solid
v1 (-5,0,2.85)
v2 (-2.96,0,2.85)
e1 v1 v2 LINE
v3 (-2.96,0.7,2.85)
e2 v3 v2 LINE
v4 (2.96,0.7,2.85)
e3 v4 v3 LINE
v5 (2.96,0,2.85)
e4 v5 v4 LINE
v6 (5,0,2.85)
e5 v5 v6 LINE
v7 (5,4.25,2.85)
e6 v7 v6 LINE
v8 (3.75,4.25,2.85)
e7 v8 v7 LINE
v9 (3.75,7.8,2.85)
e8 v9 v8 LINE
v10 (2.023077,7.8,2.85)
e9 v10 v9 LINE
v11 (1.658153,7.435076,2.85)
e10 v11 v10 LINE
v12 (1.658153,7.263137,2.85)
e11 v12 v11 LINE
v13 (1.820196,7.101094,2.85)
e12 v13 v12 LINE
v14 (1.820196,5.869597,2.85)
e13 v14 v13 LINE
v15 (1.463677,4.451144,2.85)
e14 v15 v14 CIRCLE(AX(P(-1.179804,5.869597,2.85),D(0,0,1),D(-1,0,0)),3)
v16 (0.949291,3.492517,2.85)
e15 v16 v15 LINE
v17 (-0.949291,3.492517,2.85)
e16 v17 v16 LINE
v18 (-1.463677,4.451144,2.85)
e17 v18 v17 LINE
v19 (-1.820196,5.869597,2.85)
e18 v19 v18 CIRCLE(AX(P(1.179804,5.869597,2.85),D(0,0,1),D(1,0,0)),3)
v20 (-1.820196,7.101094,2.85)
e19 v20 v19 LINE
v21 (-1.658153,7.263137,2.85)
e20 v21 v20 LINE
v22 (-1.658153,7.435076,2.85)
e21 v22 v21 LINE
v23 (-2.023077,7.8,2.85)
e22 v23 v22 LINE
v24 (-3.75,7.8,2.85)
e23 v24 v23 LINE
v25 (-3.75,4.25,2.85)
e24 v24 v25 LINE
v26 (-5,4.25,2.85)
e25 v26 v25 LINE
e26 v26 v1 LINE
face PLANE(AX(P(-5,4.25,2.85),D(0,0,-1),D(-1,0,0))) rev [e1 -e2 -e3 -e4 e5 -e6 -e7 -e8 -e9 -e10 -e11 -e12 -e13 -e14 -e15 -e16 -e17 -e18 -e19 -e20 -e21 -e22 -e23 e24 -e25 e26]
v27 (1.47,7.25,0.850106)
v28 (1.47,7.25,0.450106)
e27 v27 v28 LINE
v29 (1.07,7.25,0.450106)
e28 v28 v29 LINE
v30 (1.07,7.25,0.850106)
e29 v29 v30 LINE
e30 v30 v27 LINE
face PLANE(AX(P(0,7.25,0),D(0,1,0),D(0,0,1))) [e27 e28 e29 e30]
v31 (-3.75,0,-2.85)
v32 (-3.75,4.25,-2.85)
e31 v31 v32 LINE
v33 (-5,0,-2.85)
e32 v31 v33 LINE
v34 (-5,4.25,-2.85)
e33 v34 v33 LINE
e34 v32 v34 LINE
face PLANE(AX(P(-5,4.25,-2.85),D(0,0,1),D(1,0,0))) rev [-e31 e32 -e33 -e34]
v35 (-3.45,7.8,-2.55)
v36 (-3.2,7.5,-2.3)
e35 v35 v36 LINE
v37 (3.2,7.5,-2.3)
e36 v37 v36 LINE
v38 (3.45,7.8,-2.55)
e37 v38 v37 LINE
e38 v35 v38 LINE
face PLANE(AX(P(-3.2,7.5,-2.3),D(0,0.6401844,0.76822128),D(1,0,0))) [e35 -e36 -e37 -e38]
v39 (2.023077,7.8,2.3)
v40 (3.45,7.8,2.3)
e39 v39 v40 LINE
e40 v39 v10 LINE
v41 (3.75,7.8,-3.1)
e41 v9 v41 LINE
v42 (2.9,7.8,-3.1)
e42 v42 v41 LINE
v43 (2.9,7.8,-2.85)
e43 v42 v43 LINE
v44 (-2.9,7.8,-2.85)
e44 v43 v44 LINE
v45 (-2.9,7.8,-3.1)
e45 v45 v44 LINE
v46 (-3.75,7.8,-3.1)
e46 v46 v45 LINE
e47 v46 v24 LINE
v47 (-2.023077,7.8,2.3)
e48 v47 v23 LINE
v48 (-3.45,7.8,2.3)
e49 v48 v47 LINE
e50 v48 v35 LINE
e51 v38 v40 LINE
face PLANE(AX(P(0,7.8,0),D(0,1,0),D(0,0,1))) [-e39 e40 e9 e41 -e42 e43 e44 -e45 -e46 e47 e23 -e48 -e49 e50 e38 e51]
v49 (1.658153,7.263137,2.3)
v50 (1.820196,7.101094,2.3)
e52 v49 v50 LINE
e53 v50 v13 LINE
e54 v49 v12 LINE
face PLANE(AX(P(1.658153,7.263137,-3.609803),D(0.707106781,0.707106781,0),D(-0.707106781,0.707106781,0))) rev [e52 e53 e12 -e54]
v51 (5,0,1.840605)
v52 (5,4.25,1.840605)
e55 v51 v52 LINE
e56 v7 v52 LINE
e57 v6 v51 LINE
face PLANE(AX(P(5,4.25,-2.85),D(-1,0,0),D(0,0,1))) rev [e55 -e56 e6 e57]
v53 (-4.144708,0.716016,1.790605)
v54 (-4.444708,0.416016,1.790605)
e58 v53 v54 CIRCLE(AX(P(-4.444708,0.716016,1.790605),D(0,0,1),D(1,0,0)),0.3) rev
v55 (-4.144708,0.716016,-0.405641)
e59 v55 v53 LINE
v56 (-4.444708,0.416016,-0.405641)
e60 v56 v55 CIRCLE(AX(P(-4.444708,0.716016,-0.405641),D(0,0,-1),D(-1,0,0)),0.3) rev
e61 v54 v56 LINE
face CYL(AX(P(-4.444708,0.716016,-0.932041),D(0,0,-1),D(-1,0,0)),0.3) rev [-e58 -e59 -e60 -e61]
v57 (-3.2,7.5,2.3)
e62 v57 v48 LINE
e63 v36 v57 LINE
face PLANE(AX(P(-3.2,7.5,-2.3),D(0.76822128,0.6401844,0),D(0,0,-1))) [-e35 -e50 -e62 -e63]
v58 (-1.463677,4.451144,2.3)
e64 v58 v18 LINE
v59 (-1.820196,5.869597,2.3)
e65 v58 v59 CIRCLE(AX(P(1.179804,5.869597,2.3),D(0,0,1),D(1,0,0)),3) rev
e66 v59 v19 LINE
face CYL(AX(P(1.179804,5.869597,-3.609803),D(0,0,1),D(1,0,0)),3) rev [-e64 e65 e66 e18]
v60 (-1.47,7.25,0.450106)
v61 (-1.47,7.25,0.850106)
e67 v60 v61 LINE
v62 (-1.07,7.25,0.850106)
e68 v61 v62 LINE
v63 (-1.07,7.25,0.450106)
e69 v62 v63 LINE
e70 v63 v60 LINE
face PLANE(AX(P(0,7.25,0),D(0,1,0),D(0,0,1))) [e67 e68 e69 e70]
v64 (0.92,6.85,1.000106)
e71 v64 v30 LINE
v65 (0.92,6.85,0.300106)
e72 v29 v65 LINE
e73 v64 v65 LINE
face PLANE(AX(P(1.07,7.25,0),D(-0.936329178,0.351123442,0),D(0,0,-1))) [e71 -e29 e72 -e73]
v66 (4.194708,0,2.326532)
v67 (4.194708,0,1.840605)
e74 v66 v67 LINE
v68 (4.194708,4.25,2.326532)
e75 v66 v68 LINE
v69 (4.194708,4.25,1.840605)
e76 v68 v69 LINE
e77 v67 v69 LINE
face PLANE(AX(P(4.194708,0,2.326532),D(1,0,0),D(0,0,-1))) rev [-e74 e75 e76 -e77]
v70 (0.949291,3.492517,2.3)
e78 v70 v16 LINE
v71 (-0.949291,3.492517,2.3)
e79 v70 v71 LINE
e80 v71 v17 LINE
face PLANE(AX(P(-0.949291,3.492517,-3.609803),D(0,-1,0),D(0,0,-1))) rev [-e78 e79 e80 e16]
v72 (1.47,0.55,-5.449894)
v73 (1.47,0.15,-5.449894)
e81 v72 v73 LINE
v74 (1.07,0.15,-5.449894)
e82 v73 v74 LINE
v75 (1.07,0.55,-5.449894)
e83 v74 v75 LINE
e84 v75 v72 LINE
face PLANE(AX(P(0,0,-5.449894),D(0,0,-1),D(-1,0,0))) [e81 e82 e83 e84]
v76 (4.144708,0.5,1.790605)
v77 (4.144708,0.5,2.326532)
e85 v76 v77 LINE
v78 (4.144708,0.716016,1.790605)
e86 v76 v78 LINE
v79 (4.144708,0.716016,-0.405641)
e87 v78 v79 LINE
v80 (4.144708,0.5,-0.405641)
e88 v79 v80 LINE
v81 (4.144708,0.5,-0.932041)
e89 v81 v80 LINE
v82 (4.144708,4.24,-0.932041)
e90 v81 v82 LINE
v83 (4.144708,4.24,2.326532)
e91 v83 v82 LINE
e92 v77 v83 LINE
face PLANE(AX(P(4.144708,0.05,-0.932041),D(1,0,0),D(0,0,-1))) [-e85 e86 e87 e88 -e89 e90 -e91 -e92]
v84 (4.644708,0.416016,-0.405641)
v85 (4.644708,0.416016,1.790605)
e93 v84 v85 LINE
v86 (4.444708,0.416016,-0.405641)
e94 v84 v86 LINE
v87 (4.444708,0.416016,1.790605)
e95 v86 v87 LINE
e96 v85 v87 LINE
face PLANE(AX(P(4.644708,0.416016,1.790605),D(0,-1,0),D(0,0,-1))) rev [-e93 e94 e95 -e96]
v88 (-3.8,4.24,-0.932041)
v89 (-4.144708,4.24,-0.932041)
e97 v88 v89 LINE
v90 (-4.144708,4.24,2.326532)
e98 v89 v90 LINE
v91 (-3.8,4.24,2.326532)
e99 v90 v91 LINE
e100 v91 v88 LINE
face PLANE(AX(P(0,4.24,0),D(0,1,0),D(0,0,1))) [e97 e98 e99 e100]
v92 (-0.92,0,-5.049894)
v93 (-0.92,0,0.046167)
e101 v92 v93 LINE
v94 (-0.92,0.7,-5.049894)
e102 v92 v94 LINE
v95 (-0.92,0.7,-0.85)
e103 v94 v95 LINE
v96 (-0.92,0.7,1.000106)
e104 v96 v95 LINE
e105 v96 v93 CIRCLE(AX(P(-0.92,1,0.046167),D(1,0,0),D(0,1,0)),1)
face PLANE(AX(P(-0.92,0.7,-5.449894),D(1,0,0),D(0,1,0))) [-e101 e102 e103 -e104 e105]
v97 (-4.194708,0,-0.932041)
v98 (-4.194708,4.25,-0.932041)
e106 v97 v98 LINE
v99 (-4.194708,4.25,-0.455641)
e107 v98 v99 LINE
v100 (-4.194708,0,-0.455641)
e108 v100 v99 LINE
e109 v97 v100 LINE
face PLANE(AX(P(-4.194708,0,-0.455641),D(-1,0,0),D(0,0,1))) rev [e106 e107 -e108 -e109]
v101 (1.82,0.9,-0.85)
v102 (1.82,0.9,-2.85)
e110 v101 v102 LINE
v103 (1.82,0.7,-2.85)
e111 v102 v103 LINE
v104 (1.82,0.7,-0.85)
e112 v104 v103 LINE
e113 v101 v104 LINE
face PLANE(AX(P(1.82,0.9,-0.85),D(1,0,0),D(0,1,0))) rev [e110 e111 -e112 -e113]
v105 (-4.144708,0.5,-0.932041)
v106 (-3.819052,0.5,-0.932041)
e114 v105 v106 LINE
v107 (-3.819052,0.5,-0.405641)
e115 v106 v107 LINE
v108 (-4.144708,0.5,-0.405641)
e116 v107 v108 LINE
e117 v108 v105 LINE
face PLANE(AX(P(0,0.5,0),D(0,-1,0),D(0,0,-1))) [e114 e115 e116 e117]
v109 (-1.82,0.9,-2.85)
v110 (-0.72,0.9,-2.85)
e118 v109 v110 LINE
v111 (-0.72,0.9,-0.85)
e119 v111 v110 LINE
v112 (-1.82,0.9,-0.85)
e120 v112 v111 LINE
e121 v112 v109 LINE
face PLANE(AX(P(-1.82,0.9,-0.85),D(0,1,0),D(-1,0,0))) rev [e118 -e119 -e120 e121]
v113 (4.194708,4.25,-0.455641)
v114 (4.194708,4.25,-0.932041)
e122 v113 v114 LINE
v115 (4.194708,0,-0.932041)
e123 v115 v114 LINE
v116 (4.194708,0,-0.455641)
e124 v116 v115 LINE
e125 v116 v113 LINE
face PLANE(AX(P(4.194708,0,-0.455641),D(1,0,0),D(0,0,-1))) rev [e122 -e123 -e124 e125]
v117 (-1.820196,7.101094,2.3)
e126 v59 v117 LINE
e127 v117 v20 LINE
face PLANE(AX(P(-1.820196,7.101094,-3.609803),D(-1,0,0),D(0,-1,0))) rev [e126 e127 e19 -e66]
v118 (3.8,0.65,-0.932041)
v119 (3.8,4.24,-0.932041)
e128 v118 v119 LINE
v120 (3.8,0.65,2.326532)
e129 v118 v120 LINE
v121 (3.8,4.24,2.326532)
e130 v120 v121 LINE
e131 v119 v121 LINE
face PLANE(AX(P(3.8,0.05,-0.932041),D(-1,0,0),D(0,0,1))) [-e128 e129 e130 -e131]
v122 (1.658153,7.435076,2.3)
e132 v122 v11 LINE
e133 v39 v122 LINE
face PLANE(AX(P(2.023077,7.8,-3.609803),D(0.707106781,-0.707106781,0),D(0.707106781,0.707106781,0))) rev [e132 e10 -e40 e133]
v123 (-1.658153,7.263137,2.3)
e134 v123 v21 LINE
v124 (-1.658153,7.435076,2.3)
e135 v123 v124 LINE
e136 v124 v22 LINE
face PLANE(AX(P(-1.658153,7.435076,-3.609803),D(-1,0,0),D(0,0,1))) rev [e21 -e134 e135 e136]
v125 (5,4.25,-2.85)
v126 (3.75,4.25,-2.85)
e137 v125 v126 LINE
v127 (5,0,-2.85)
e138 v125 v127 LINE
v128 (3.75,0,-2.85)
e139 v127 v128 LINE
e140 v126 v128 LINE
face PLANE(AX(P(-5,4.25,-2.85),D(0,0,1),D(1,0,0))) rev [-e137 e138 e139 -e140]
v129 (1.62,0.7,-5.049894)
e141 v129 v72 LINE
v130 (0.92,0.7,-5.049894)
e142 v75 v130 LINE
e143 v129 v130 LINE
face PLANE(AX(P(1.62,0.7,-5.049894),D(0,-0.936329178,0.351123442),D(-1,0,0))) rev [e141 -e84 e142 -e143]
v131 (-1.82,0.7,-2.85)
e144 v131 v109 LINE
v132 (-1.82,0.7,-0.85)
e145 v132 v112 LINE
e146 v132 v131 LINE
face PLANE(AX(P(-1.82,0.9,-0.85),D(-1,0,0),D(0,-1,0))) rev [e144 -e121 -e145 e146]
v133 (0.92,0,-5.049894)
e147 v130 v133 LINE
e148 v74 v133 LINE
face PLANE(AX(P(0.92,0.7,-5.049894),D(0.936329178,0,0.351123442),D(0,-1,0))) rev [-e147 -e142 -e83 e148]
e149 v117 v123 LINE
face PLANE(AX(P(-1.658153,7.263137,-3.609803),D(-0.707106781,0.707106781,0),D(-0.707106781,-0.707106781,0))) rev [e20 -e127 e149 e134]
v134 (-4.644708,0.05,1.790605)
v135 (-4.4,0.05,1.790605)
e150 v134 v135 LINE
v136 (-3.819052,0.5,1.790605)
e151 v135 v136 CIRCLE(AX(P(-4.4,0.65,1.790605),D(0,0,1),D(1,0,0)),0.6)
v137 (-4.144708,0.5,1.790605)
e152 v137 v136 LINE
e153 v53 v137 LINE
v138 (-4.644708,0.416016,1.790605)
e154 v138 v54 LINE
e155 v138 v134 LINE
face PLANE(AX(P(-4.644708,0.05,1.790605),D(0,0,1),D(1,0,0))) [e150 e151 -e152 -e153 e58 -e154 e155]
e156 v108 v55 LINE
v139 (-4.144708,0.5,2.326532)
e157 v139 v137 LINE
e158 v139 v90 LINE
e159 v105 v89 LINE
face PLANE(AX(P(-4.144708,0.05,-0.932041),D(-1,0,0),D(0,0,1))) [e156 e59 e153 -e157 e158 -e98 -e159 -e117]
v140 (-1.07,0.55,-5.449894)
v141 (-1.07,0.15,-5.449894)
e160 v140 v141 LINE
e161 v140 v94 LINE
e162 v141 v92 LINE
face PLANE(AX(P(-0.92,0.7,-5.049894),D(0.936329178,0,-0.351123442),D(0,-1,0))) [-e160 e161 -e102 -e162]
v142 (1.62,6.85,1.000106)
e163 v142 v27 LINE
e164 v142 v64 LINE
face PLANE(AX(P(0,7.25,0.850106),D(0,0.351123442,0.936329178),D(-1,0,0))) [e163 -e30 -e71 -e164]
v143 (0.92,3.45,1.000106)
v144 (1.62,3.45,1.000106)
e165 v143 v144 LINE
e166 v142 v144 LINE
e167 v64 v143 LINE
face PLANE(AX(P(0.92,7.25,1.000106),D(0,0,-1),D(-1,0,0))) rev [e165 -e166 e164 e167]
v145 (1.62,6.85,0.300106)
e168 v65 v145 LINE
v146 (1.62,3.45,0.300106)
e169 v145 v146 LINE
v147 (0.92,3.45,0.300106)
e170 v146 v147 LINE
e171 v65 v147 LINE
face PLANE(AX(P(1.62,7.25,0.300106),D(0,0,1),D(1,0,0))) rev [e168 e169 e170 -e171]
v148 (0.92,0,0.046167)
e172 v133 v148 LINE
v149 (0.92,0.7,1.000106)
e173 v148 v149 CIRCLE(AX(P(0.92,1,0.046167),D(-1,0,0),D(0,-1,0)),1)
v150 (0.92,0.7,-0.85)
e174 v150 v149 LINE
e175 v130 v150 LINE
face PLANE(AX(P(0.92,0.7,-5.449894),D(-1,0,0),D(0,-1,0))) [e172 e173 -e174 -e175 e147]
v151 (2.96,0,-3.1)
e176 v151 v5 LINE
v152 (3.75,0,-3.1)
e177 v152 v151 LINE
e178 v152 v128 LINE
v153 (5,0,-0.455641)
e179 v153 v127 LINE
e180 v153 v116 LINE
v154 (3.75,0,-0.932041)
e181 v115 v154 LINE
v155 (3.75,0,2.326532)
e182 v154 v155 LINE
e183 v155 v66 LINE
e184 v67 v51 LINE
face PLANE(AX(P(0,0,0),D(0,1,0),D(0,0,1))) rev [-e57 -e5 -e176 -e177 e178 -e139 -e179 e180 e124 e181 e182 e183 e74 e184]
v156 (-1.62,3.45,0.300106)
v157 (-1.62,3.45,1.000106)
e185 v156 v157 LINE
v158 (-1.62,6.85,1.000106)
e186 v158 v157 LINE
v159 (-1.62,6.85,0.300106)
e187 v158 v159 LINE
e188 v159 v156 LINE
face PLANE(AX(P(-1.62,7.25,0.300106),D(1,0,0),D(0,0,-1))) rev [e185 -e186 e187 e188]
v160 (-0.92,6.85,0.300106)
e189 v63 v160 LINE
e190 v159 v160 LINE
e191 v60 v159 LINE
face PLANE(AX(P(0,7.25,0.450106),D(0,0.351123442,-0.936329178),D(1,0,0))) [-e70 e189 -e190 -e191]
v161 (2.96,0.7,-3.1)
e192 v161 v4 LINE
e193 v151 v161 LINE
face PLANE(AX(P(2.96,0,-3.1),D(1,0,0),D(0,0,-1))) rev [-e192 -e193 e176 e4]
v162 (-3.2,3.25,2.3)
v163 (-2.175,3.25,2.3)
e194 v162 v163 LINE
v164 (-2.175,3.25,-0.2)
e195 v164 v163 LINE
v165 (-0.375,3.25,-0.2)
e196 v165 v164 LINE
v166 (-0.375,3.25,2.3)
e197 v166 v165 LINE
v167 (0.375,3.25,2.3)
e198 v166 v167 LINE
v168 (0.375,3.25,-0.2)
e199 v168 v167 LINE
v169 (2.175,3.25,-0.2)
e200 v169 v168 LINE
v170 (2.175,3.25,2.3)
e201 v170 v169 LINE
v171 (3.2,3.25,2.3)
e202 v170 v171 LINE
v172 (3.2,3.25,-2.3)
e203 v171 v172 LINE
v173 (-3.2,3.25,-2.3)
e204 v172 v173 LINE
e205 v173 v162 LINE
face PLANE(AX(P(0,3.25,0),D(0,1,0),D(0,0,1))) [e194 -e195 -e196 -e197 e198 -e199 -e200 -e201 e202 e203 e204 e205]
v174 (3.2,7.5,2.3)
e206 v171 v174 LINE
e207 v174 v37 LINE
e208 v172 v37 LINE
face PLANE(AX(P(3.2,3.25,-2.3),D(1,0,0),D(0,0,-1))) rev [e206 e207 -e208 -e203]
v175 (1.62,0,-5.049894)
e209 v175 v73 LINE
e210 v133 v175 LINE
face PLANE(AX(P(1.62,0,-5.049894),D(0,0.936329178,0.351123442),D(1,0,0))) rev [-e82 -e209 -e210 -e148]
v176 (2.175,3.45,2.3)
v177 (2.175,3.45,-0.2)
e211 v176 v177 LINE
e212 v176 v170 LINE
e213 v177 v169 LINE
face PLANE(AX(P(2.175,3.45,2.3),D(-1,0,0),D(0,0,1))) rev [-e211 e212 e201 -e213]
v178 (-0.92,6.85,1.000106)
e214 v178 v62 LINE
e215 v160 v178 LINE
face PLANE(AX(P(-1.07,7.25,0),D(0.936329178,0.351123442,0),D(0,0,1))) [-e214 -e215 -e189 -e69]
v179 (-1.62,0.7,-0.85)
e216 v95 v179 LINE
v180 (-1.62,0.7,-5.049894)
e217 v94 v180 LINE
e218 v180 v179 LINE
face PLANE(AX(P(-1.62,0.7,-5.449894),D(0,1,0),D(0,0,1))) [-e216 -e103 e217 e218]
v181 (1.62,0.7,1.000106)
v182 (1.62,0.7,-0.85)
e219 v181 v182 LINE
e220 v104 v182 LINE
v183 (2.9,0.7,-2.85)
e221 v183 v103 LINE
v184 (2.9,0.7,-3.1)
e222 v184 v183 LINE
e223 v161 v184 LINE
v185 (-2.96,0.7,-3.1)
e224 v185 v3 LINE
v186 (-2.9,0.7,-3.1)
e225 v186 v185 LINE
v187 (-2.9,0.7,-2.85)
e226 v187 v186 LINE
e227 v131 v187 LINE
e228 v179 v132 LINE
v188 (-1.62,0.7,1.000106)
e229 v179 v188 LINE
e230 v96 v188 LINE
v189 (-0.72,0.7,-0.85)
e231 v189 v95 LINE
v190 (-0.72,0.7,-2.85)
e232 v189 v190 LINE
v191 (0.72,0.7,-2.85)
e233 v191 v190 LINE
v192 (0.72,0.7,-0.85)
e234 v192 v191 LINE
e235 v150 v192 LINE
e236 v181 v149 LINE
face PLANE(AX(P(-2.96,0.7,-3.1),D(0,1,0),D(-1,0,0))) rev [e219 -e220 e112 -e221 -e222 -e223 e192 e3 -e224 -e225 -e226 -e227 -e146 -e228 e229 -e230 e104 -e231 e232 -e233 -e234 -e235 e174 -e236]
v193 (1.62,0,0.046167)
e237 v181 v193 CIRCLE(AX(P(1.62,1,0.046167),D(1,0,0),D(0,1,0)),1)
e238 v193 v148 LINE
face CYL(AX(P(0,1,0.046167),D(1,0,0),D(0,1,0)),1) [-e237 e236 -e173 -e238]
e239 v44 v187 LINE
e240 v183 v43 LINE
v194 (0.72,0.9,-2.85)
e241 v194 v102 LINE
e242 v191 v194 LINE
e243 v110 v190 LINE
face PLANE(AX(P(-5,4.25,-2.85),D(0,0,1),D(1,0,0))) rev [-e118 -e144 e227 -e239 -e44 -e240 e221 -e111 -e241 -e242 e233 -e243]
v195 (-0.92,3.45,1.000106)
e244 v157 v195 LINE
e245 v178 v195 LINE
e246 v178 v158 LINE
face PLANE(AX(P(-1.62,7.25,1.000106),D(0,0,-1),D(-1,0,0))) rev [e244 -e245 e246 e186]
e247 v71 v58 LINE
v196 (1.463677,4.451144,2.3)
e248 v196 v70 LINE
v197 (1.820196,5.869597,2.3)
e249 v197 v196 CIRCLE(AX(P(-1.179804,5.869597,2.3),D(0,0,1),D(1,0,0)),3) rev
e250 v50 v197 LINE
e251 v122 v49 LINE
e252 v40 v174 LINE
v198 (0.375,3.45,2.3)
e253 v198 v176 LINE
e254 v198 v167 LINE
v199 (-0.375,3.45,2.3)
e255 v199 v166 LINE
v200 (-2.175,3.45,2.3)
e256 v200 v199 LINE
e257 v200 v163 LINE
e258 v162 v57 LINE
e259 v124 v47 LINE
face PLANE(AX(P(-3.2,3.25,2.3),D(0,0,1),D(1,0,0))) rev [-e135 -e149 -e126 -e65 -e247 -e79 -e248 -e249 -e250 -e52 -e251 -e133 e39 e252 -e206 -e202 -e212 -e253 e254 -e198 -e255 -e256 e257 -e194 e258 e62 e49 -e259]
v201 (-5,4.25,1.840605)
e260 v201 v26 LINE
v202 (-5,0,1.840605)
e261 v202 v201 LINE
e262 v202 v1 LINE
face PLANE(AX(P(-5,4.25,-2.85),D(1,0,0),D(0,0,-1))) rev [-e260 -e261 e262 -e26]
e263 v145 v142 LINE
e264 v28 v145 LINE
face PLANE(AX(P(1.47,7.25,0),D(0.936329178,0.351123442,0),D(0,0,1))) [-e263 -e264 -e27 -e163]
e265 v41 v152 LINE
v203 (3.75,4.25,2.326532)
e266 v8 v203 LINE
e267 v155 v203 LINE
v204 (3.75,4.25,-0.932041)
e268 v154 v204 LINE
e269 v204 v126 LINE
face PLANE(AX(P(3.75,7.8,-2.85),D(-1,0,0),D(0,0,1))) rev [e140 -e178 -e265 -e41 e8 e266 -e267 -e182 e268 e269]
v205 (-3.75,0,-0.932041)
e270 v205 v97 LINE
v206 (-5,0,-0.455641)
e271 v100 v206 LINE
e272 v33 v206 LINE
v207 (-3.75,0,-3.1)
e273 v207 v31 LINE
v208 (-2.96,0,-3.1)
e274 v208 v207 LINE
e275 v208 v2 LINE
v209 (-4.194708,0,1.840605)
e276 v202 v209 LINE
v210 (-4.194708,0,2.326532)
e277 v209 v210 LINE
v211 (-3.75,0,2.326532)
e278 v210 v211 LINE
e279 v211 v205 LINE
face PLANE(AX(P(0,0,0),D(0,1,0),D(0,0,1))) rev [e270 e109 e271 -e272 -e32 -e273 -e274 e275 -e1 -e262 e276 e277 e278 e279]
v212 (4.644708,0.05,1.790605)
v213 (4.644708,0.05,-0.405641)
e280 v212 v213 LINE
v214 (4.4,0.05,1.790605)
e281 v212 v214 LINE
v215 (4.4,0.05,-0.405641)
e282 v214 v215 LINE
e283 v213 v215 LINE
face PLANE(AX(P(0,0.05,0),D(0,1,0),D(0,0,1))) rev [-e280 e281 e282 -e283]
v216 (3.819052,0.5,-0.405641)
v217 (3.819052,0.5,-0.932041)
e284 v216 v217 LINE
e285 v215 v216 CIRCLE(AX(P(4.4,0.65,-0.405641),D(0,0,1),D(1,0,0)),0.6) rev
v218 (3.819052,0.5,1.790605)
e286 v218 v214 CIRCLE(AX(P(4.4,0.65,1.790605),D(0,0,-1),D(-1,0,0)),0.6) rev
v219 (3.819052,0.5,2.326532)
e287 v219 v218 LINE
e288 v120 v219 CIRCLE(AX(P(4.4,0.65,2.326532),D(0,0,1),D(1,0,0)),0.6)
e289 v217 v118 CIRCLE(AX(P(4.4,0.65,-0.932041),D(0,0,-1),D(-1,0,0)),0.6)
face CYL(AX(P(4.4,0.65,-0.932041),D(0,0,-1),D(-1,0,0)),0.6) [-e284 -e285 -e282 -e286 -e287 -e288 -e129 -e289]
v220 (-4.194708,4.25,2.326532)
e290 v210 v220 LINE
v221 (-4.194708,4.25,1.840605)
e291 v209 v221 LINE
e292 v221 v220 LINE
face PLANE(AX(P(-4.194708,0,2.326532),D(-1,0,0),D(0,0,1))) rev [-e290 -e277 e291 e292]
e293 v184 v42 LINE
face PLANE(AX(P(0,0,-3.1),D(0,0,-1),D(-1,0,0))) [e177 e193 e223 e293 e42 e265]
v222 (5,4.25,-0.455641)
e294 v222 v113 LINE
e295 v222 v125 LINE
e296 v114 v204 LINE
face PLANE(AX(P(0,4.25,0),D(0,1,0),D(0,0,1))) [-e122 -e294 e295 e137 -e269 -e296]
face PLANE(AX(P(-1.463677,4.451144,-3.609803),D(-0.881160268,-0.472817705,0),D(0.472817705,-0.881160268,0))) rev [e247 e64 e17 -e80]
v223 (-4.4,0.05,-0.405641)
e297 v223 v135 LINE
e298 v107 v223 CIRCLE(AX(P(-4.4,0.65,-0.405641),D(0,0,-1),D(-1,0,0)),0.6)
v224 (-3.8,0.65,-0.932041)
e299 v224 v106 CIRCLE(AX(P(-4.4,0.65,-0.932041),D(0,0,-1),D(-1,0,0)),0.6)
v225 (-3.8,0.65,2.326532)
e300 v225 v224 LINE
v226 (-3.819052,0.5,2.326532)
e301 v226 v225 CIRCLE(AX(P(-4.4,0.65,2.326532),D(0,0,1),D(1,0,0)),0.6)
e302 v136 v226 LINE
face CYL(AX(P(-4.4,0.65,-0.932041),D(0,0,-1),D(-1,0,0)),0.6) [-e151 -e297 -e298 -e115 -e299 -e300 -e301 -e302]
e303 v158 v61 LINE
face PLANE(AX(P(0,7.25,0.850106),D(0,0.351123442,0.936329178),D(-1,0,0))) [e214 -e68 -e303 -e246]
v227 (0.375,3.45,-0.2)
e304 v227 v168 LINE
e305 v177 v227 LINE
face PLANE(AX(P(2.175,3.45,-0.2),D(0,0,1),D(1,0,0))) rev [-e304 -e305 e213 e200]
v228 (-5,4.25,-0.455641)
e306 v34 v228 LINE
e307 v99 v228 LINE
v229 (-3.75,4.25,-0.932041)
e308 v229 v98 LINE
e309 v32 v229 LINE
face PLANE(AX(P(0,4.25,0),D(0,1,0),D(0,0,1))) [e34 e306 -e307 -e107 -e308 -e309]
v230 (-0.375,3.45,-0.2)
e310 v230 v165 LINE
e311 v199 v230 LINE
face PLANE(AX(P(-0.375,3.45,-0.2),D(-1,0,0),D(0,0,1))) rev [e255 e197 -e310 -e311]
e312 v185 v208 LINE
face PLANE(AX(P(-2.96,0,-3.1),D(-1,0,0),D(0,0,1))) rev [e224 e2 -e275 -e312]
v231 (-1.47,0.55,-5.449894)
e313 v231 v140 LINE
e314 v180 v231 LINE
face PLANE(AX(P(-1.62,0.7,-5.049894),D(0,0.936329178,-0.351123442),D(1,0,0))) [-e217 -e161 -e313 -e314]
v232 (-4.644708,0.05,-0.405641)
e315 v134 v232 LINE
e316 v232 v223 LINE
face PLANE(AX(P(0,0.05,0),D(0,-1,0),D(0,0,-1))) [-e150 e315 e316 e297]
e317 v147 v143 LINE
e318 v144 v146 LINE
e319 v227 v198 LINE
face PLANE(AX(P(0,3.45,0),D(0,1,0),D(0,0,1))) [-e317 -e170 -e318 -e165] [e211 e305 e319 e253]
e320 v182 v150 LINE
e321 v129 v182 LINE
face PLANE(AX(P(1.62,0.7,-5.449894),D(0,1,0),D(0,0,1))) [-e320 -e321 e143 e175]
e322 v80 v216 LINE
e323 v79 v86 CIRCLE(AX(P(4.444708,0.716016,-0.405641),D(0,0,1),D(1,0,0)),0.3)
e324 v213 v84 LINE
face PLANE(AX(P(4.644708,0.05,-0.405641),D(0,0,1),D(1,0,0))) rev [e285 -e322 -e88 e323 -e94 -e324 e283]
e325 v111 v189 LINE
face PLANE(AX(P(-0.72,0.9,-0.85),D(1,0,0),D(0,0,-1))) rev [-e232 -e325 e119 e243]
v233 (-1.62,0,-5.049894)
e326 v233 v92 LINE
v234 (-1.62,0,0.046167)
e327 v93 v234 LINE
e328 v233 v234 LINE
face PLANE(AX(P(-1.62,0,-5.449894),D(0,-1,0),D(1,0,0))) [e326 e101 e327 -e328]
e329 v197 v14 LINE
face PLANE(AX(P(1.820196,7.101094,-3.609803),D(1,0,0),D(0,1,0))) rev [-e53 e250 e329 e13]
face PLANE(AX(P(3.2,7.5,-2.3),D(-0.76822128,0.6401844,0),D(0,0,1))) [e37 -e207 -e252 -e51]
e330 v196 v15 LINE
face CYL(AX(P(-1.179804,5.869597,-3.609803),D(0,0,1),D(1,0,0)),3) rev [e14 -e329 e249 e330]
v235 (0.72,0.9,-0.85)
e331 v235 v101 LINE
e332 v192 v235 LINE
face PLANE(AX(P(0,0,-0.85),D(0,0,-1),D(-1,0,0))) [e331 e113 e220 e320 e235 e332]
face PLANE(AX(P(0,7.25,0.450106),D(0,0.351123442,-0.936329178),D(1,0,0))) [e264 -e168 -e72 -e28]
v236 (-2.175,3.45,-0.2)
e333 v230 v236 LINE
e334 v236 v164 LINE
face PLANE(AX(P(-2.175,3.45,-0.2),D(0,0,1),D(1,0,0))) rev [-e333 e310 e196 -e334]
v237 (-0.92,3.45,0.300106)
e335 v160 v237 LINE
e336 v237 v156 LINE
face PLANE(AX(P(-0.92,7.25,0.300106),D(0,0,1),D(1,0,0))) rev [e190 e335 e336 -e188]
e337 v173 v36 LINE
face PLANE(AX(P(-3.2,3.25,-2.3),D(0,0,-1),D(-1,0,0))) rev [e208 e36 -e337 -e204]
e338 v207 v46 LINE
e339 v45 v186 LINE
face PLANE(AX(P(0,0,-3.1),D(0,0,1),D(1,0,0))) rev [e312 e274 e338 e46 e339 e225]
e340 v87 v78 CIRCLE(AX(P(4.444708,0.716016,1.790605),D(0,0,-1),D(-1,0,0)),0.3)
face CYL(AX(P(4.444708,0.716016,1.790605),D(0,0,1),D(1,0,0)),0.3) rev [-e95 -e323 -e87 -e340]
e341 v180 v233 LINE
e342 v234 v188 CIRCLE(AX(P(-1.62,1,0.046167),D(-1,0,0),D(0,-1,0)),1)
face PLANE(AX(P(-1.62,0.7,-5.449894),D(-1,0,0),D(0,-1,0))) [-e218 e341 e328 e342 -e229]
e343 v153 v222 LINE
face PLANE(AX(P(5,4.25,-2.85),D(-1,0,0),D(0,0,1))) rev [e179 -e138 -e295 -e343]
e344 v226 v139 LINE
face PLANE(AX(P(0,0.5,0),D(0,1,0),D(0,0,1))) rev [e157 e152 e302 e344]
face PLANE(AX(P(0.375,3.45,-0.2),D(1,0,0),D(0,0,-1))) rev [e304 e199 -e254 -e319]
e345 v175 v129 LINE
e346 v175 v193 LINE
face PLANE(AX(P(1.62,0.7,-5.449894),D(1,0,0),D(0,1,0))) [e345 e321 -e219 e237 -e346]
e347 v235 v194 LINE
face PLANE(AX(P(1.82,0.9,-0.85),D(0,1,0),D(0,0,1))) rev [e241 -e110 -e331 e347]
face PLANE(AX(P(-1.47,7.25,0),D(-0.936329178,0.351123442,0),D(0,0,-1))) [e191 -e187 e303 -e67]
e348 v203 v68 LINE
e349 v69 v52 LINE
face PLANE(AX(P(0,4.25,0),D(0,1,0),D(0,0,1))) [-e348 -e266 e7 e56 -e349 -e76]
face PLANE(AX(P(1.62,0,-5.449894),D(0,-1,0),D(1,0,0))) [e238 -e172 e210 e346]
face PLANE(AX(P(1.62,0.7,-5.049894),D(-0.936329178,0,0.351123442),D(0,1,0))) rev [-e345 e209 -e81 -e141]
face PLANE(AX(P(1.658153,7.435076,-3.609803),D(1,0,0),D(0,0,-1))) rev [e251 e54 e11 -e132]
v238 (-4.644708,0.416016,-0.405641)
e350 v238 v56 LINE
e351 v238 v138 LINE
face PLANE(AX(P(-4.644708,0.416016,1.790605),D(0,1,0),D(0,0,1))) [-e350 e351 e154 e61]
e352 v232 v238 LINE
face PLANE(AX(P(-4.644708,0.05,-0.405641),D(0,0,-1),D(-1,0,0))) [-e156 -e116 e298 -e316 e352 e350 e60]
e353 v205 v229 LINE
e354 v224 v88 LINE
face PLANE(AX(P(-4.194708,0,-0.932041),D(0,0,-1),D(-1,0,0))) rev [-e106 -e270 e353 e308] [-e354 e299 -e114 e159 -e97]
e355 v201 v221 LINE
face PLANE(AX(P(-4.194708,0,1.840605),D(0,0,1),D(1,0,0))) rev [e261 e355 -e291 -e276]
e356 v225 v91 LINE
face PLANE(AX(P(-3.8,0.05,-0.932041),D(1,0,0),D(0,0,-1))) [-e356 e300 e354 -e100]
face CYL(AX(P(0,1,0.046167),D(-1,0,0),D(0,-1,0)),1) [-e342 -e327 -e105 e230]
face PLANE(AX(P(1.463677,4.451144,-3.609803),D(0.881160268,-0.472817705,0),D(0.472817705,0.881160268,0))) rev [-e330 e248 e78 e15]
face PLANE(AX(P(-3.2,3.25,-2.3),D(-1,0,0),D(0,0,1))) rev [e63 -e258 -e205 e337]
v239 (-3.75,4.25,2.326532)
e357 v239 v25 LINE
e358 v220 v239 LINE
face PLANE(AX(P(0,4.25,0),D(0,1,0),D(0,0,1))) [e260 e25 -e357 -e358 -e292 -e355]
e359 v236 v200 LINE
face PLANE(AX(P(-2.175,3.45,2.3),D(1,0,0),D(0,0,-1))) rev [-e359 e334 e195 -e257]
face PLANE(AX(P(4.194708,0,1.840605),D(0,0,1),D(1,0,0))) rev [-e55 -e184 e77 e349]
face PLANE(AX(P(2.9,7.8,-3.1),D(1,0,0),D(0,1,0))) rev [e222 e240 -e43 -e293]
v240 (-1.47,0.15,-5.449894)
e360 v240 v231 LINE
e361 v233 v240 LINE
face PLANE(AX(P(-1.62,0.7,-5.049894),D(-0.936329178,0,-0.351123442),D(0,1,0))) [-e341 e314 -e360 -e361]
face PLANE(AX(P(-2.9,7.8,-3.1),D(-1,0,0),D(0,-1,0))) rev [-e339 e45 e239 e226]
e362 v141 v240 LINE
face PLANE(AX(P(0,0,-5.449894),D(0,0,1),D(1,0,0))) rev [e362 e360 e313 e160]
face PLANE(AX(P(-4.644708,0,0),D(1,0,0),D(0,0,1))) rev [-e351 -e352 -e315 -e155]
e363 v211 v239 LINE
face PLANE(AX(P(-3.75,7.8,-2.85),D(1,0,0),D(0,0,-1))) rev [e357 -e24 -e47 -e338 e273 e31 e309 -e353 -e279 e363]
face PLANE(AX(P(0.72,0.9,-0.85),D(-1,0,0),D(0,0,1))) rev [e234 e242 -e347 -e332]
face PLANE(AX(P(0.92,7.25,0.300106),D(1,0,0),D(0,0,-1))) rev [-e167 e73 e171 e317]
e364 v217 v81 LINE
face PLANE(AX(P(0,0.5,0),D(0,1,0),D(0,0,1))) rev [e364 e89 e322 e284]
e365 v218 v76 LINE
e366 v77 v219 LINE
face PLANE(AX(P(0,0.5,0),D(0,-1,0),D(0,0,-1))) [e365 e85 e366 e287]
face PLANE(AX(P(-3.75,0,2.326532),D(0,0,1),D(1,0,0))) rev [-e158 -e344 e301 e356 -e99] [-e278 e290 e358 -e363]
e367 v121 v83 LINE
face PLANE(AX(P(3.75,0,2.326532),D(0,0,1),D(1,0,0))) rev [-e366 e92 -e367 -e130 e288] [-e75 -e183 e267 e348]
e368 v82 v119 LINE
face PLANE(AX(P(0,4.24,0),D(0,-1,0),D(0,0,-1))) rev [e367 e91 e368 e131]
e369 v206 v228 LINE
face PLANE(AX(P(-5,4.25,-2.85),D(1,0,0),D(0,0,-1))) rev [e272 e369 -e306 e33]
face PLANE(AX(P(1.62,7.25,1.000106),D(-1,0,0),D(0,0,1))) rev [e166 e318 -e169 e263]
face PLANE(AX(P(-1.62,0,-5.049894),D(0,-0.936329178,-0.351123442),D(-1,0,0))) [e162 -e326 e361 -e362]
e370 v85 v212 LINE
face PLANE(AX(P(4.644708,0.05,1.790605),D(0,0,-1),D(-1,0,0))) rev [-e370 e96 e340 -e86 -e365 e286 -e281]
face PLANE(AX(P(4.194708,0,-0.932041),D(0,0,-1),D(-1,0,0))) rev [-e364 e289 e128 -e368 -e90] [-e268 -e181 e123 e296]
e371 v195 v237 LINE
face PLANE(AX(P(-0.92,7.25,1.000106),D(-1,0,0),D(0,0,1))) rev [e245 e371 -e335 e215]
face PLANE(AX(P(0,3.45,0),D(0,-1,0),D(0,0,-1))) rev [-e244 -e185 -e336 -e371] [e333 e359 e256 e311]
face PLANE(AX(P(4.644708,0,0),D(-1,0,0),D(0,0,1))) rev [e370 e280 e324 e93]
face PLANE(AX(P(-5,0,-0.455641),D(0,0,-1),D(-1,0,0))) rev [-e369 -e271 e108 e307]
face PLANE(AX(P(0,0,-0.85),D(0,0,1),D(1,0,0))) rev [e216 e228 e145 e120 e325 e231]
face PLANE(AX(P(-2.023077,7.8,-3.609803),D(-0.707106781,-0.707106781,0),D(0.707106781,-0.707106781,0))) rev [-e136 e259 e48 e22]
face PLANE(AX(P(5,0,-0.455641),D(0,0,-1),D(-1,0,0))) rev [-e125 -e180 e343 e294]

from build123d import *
from OCP.BRepFilletAPI import BRepFilletAPI_MakeChamfer

# Parameters (mm, degrees)
SKETCH1_W           = 10
SKETCH1_H           = 5.7
BOSS_EXTRUDE1_DEPTH = 4.25
BOSS_EXTRUDE2_DEPTH = 3.55
BOSS_EXTRUDE3_DEPTH = 0.25
SKETCH4_W           = 6.399999999999999
SKETCH4_H           = 4.6
CUT_EXTRUDE1_DEPTH  = 4.55
BOSS_EXTRUDE4_DEPTH = 0.2
BOSS_EXTRUDE5_DEPTH = 4
CHAMFER1_SIZE       = 0.25
CHAMFER1_SIZE2      = 0.3
CUT_EXTRUDE5_DEPTH  = 0.55
CUT_EXTRUDE6_DEPTH  = 12.011017210049216
CHAMFER2_SIZE       = 0.4
CHAMFER2_SIZE2      = 0.15
BOSS_EXTRUDE6_DEPTH = 6.45
CHAMFER3_SIZE       = 0.15
CHAMFER3_SIZE2      = 0.4
CUT_EXTRUDE7_DEPTH  = 2
FILLET1_R           = 1
CUT_EXTRUDE8_DEPTH  = 11.749015904295446
SKETCH13_W          = 0.34470786446686574
SKETCH13_H          = 3.258573050104898
SKETCH13_H_2        = 3.2585730501048964
BOSS_EXTRUDE7_DEPTH = 4.2
SKETCH14_W          = 2.1962459212727503
SKETCH14_H          = 0.3660162451661128
BOSS_EXTRUDE8_DEPTH = 0.5
SKETCH15_W          = 0.34470786446686574
SKETCH15_H          = 0.535927560103362
SKETCH15_H_2        = 0.526399568728786
SKETCH15_H_3        = 0.5263995687287861
CUT_EXTRUDE9_DEPTH  = 0.5
SKETCH16_W          = 0.34470786446686574
SKETCH16_H          = 3.2585730501048964
SKETCH16_H_2        = 3.258573050104898
CUT_EXTRUDE10_DEPTH = 0.01
FILLET3_R           = 0.3
FILLET4_R           = 0.6


with BuildPart() as part:
    # Sketch1 → Boss-Extrude1 (new body)
    with BuildSketch(Plane(origin=(0, 0, 0), x_dir=(1, 0, 0), z_dir=(0, 1, 0))):
        Rectangle(SKETCH1_W, SKETCH1_H)
    extrude(amount=BOSS_EXTRUDE1_DEPTH)

    # Sketch2 → Boss-Extrude2 (add)
    with BuildSketch(Plane(origin=(0, 4.25, 0), x_dir=(1, 0, 0), z_dir=(0, 1, 0))):
        Polygon((-3.75, 2.8499999999999996), (3.75, 2.8499999999999996), (3.7499999999999996, -2.8500000000000005), (-3.7499999999999987, -2.8500000000000005), align=None)
    extrude(amount=BOSS_EXTRUDE2_DEPTH)

    # Sketch3 → Boss-Extrude3 (add)
    with BuildSketch(Plane(origin=(0, 0, -2.8499999999999996), x_dir=(-1, 0, 0), z_dir=(0, 0, -1))):
        Polygon((-3.75, 7.8), (-2.9, 7.8), (-2.899999999999999, 8e-17), (-3.75, 0), align=None)
        Polygon((3.75, 0), (2.899999999999999, 8e-17), (2.9, 7.8), (3.75, 7.8), align=None)
    extrude(amount=BOSS_EXTRUDE3_DEPTH)

    # Sketch4 → Cut-Extrude1 (cut)
    with BuildSketch(Plane(origin=(0, 7.8, 0), x_dir=(1, 0, 0), z_dir=(0, 1, 0))):
        Rectangle(SKETCH4_W, SKETCH4_H)
    extrude(amount=-CUT_EXTRUDE1_DEPTH, mode=Mode.SUBTRACT)

    # Sketch5 → Boss-Extrude4 (add)
    # profile 1 of 2: a face of its own
    with BuildSketch(Plane(origin=(0, 3.2499999999999996, 0), x_dir=(1, 0, 0), z_dir=(0, 1, 0))):
        Polygon((-2.174999999999999, -2.3000000000000003), (-2.174999999999999, 0.19999999999999923), (-0.3749999999999999, 0.1999999999999991), (-0.37499999999999944, -2.3000000000000003), align=None)
        Polygon((-1.6199999999999999, -0.30010615600666696), (-0.9199999999999999, -0.30010615600666696), (-0.9199999999999997, -1.0001061560066669), (-1.6199999999999997, -1.0001061560066669), align=None, mode=Mode.SUBTRACT)
    # profile 2 of 2: a face of its own
    with BuildSketch(Plane(origin=(0, 3.2499999999999996, 0), x_dir=(1, 0, 0), z_dir=(0, 1, 0))):
        Polygon((2.174999999999999, -2.3000000000000003), (0.37499999999999944, -2.3000000000000003), (0.3749999999999999, 0.1999999999999991), (2.174999999999999, 0.19999999999999923), align=None)
        Polygon((1.6199999999999997, -1.0001061560066669), (0.9199999999999997, -1.0001061560066669), (0.9199999999999999, -0.30010615600666696), (1.6199999999999999, -0.30010615600666696), align=None, mode=Mode.SUBTRACT)
    extrude(amount=BOSS_EXTRUDE4_DEPTH)

    # Sketch6 → Boss-Extrude5 (add)
    with BuildSketch(Plane(origin=(0, 3.2499999999999996, 0), x_dir=(1, 0, 0), z_dir=(0, 1, 0))):
        Polygon((-0.9199999999999997, -1.0001061560066669), (-0.9199999999999999, -0.30010615600666696), (-1.6199999999999999, -0.30010615600666696), (-1.6199999999999997, -1.0001061560066669), align=None)
        Polygon((1.6199999999999997, -1.0001061560066669), (1.6199999999999999, -0.30010615600666696), (0.9199999999999999, -0.30010615600666696), (0.9199999999999997, -1.0001061560066669), align=None)
    extrude(amount=BOSS_EXTRUDE5_DEPTH)

    # Chamfer1
    chamfer1_edges = [part.edges().sort_by_distance(p)[0] for p in [
        (3.1999999999999993, 7.8, 4.4e-16),
        (4.4e-16, 7.8, -2.2999999999999994),
        (-3.199999999999999, 7.8, 4.4e-16),
    ]]
    chamfer1_side = [part.faces().sort_by_distance(p)[0] for p in [
        (-2.99573531218939, 7.8, -2.9749999999999996),
    ]]
    chamfer(chamfer1_edges, length=CHAMFER1_SIZE, length2=CHAMFER1_SIZE2, reference=chamfer1_side[0])

    # Sketch7 → Cut-Extrude5 (cut)
    with BuildSketch(Plane.XY.offset(2.8500000000000005)):
        with BuildLine():
            Line((-2.0230768172750717, 7.8), (-1.658152916079166, 7.435076098804102))
            Line((-1.658152916079166, 7.435076098804102), (-1.658152916079166, 7.263136663157135))
            Line((-1.658152916079166, 7.263136663157135), (-1.8201957124672143, 7.101093866769083))
            Line((-1.8201957124672143, 7.101093866769083), (-1.820195712467214, 5.869596920770719))
            ThreePointArc((-1.820195712467214, 5.869596920770719), (-1.729701032325909, 5.138311207992215), (-1.4636765166579089, 4.4511438063269075))
            Line((-1.4636765166579089, 4.4511438063269075), (-0.9492914576822651, 3.492517105508663))
            Line((-0.9492914576822651, 3.492517105508663), (0.9492914576822654, 3.492517105508663))
            Line((0.9492914576822654, 3.492517105508663), (1.4636765166579093, 4.4511438063269075))
            ThreePointArc((1.4636765166579093, 4.4511438063269075), (1.7297010323259099, 5.1383112079922135), (1.8201957124672148, 5.869596920770719))
            Line((1.8201957124672148, 5.869596920770719), (1.8201957124672143, 7.101093866769083))
            Line((1.8201957124672143, 7.101093866769083), (1.6581529160791668, 7.263136663157135))
            Line((1.6581529160791668, 7.263136663157135), (1.6581529160791668, 7.435076098804102))
            Line((1.6581529160791668, 7.435076098804102), (2.0230768172750717, 7.8))
            Line((2.0230768172750717, 7.8), (-2.0230768172750717, 7.8))
        make_face()
    extrude(amount=-CUT_EXTRUDE5_DEPTH, mode=Mode.SUBTRACT)

    # Sketch8 → Cut-Extrude6 (cut, through all)
    with BuildSketch(Plane.XY.offset(2.8500000000000005)):
        Polygon((-2.96, 0), (2.96, 0), (2.96, 0.7000000000000003), (-2.96, 0.7), align=None)
    extrude(amount=-CUT_EXTRUDE6_DEPTH, mode=Mode.SUBTRACT)

    # Chamfer2: one chamfer whose edges measure the first distance from different faces: ONE call of the kernel's chamfer builder (chamfer() names one face for all edges)
    chamfer2_edges_1 = [part.edges().sort_by_distance(p)[0] for p in [
        (-1.2699999999999996, 7.25, 1.0001061560066669),
    ]]
    chamfer2_side_1 = [part.faces().sort_by_distance(p)[0] for p in [
        (-1.2699999999999998, 5.35, 1.0001061560066669),
    ]]
    chamfer2_edges_2 = [part.edges().sort_by_distance(p)[0] for p in [
        (-0.9199999999999998, 7.25, 0.6501061560066669),
    ]]
    chamfer2_side_2 = [part.faces().sort_by_distance(p)[0] for p in [
        (-0.9199999999999998, 5.35, 0.6501061560066669),
    ]]
    chamfer2_edges_3 = [part.edges().sort_by_distance(p)[0] for p in [
        (-1.27, 7.25, 0.30010615600666696),
    ]]
    chamfer2_side_3 = [part.faces().sort_by_distance(p)[0] for p in [
        (-1.2699999999999998, 5.35, 0.30010615600666696),
    ]]
    chamfer2_edges_4 = [part.edges().sort_by_distance(p)[0] for p in [
        (-1.6199999999999997, 7.25, 0.650106156006667),
    ]]
    chamfer2_side_4 = [part.faces().sort_by_distance(p)[0] for p in [
        (-1.6199999999999997, 5.35, 0.650106156006667),
    ]]
    chamfer2_edges_5 = [part.edges().sort_by_distance(p)[0] for p in [
        (1.2699999999999996, 7.25, 1.0001061560066669),
    ]]
    chamfer2_side_5 = [part.faces().sort_by_distance(p)[0] for p in [
        (1.2699999999999998, 5.35, 1.0001061560066669),
    ]]
    chamfer2_edges_6 = [part.edges().sort_by_distance(p)[0] for p in [
        (1.6199999999999997, 7.25, 0.6501061560066669),
    ]]
    chamfer2_side_6 = [part.faces().sort_by_distance(p)[0] for p in [
        (1.6199999999999997, 5.35, 0.6501061560066669),
    ]]
    chamfer2_edges_7 = [part.edges().sort_by_distance(p)[0] for p in [
        (1.27, 7.25, 0.30010615600666696),
    ]]
    chamfer2_side_7 = [part.faces().sort_by_distance(p)[0] for p in [
        (1.2699999999999998, 5.35, 0.30010615600666696),
    ]]
    chamfer2_edges_8 = [part.edges().sort_by_distance(p)[0] for p in [
        (0.9199999999999998, 7.25, 0.650106156006667),
    ]]
    chamfer2_side_8 = [part.faces().sort_by_distance(p)[0] for p in [
        (0.9199999999999998, 5.35, 0.650106156006667),
    ]]
    chamfer2 = BRepFilletAPI_MakeChamfer(part.part.solid().wrapped)
    for e in chamfer2_edges_1:
        chamfer2.Add(CHAMFER2_SIZE, CHAMFER2_SIZE2, e.wrapped, chamfer2_side_1[0].wrapped)  # the first distance lies on this face
    for e in chamfer2_edges_2:
        chamfer2.Add(CHAMFER2_SIZE, CHAMFER2_SIZE2, e.wrapped, chamfer2_side_2[0].wrapped)  # the first distance lies on this face
    for e in chamfer2_edges_3:
        chamfer2.Add(CHAMFER2_SIZE, CHAMFER2_SIZE2, e.wrapped, chamfer2_side_3[0].wrapped)  # the first distance lies on this face
    for e in chamfer2_edges_4:
        chamfer2.Add(CHAMFER2_SIZE, CHAMFER2_SIZE2, e.wrapped, chamfer2_side_4[0].wrapped)  # the first distance lies on this face
    for e in chamfer2_edges_5:
        chamfer2.Add(CHAMFER2_SIZE, CHAMFER2_SIZE2, e.wrapped, chamfer2_side_5[0].wrapped)  # the first distance lies on this face
    for e in chamfer2_edges_6:
        chamfer2.Add(CHAMFER2_SIZE, CHAMFER2_SIZE2, e.wrapped, chamfer2_side_6[0].wrapped)  # the first distance lies on this face
    for e in chamfer2_edges_7:
        chamfer2.Add(CHAMFER2_SIZE, CHAMFER2_SIZE2, e.wrapped, chamfer2_side_7[0].wrapped)  # the first distance lies on this face
    for e in chamfer2_edges_8:
        chamfer2.Add(CHAMFER2_SIZE, CHAMFER2_SIZE2, e.wrapped, chamfer2_side_8[0].wrapped)  # the first distance lies on this face
    add(Compound.cast(chamfer2.Shape()), mode=Mode.REPLACE)

    # Sketch10 → Boss-Extrude6 (add)
    with BuildSketch(Plane.XY.offset(1.0001061560066669)):
        Polygon((-1.6199999999999999, 0.7000000000000003), (-0.9199999999999997, 0.7000000000000003), (-0.9199999999999996, 0), (-1.6199999999999994, 0), align=None)
        Polygon((1.6199999999999994, 0), (0.9199999999999996, 0), (0.9199999999999997, 0.7000000000000003), (1.6199999999999999, 0.7000000000000003), align=None)
    extrude(amount=-BOSS_EXTRUDE6_DEPTH)

    # Chamfer3: one chamfer whose edges measure the first distance from different faces: ONE call of the kernel's chamfer builder (chamfer() names one face for all edges)
    chamfer3_edges_1 = [part.edges().sort_by_distance(p)[0] for p in [
        (-1.2699999999999998, 0.7000000000000003, -5.449893843993333),
        (-1.6199999999999997, 0.35000000000000014, -5.449893843993333),
        (-0.9199999999999997, 0.35000000000000014, -5.449893843993333),
        (-1.2699999999999996, 0, -5.449893843993333),
    ]]
    chamfer3_side_1 = [part.faces().sort_by_distance(p)[0] for p in [
        (-1.2699999999999996, 0.3500000000000002, -5.449893843993333),
    ]]
    chamfer3_edges_2 = [part.edges().sort_by_distance(p)[0] for p in [
        (1.2699999999999998, 0.7000000000000003, -5.449893843993333),
        (1.6199999999999997, 0.35000000000000014, -5.449893843993333),
        (1.2699999999999996, 0, -5.449893843993333),
        (0.9199999999999997, 0.35000000000000014, -5.449893843993333),
    ]]
    chamfer3_side_2 = [part.faces().sort_by_distance(p)[0] for p in [
        (1.2699999999999996, 0.3500000000000002, -5.449893843993333),
    ]]
    chamfer3 = BRepFilletAPI_MakeChamfer(part.part.solid().wrapped)
    for e in chamfer3_edges_1:
        chamfer3.Add(CHAMFER3_SIZE, CHAMFER3_SIZE2, e.wrapped, chamfer3_side_1[0].wrapped)  # the first distance lies on this face
    for e in chamfer3_edges_2:
        chamfer3.Add(CHAMFER3_SIZE, CHAMFER3_SIZE2, e.wrapped, chamfer3_side_2[0].wrapped)  # the first distance lies on this face
    add(Compound.cast(chamfer3.Shape()), mode=Mode.REPLACE)

    # Sketch11 → Cut-Extrude7 (cut)
    with BuildSketch(Plane(origin=(0, 0, -2.8499999999999996), x_dir=(-1, 0, 0), z_dir=(0, 0, -1))):
        Polygon((-1.8200000000000005, 0.9000000000000004), (-0.7200000000000002, 0.9000000000000004), (-0.7200000000000002, 0.7000000000000004), (-1.82, 0.7000000000000004), align=None)
        Polygon((1.8199999999999994, 0.9000000000000004), (0.7199999999999993, 0.9000000000000004), (0.7199999999999993, 0.7000000000000004), (1.8199999999999992, 0.7000000000000004), align=None)
    extrude(amount=-CUT_EXTRUDE7_DEPTH, mode=Mode.SUBTRACT)

    # Fillet1
    # the kernel refuses this fillet: 1 mm, written as the material it takes off along each edge
    with BuildSketch(Plane(origin=(1.464848003542365, 0, 1.0001061560066669), x_dir=(0, 0, -1), z_dir=(-1, 0, 0))) as fillet1_piece_1:
        with BuildLine():
            CenterArc((0.9539392014169458, -1), FILLET1_R, 90, 72.54239687627793)
            Line((0, -0.7000000000000003), (0, 0))
            Line((0, 0), (0.9539392014169458, 0))
        make_face()
    extrude(amount=3.0848480035423647, mode=Mode.SUBTRACT)
    with BuildSketch(Plane(origin=(1.6199999999999994, 0, 1.0001061560066669), x_dir=(0, 0, -1), z_dir=(-1, 0, 0))) as fillet1_piece_2:
        with BuildLine():
            CenterArc((0.9539392014169458, -1), FILLET1_R, 90, 72.54239687627793)
            Line((0, -0.7000000000000003), (0, 0))
            Line((0, 0), (0.9539392014169458, 0))
        make_face()
    extrude(amount=3.0848480035423638, mode=Mode.SUBTRACT)

    # Sketch12 → Cut-Extrude8 (cut, through all)
    with BuildSketch(Plane(origin=(0, 7.8, 0), x_dir=(1, 0, 0), z_dir=(0, 1, 0))):
        Polygon((5, 0.4556412762642724), (4.194707864466865, 0.4556412762642724), (4.194707864466865, 0.9320408449930586), (3.75, 0.9320408449930585), (3.750000000000001, -2.32653220511184), (4.194707864466865, -2.32653220511184), (4.194707864466865, -1.8406046450084779), (5, -1.8406046450084779), align=None)
        Polygon((-4.194707864466865, -1.8406046450084779), (-5, -1.8406046450084779), (-5, 0.4556412762642724), (-4.194707864466865, 0.4556412762642724), (-4.194707864466865, 0.9320408449930586), (-3.75, 0.9320408449930585), (-3.750000000000001, -2.32653220511184), (-4.194707864466865, -2.32653220511184), align=None)
    extrude(amount=-CUT_EXTRUDE8_DEPTH, mode=Mode.SUBTRACT)

    # Sketch13 → Boss-Extrude7 (add)
    with BuildSketch(Plane(origin=(0, 4.25, 0), x_dir=(1, 0, 0), z_dir=(0, 1, 0))):
        with Locations((3.9723539322334327, -0.6972456800593906)):
            Rectangle(SKETCH13_W, SKETCH13_H)
        with Locations((-3.9723539322334327, -0.6972456800593899)):
            Rectangle(SKETCH13_W, SKETCH13_H_2)
    extrude(amount=-BOSS_EXTRUDE7_DEPTH)

    # Sketch14 → Boss-Extrude8 (add)
    with BuildSketch(Plane(origin=(4.144707864466866, 0, 0), x_dir=(0, 0, -1), z_dir=(1, 0, 0))):
        with Locations((-0.6924816843721028, 0.23300812258305612)):
            Rectangle(SKETCH14_W, SKETCH14_H)
    boss_extrude8 = extrude(amount=BOSS_EXTRUDE8_DEPTH)

    # Mirror3: Boss-Extrude8 across plane
    add(boss_extrude8.mirror(Plane(origin=(0, 0, 0), x_dir=(0, 0, 1), z_dir=(1, 0, 0))))

    # Sketch15 → Cut-Extrude9 (cut)
    with BuildSketch(Plane.XZ):
        with Locations((-3.9723539322334327, 2.058568425060159)):
            Rectangle(SKETCH15_W, SKETCH15_H)
        with Locations((-3.9723539322334327, -0.6688410606286654)):
            Rectangle(SKETCH15_W, SKETCH15_H_2)
        with Locations((3.9723539322334327, 2.058568425060159)):
            Rectangle(SKETCH15_W, SKETCH15_H)
        with Locations((3.9723539322334327, -0.6688410606286654)):
            Rectangle(SKETCH15_W, SKETCH15_H_3)
    extrude(amount=-CUT_EXTRUDE9_DEPTH, mode=Mode.SUBTRACT)

    # Sketch16 → Cut-Extrude10 (cut)
    with BuildSketch(Plane(origin=(0, 4.25, 0), x_dir=(1, 0, 0), z_dir=(0, 1, 0))):
        with Locations((-3.9723539322334327, -0.6972456800593899)):
            Rectangle(SKETCH16_W, SKETCH16_H)
        with Locations((3.9723539322334327, -0.6972456800593906)):
            Rectangle(SKETCH16_W, SKETCH16_H_2)
    extrude(amount=-CUT_EXTRUDE10_DEPTH, mode=Mode.SUBTRACT)

    # Fillet3
    # the kernel refuses this fillet: 0.3 mm, written as the material it adds along each edge
    with BuildSketch(Plane(origin=(4.144707864466866, 0.4160162451661125, -0.4056412762642723), x_dir=(0, 1, 0), z_dir=(0, 0, 1))) as fillet3_piece_1:
        with BuildLine():
            CenterArc((FILLET3_R, -FILLET3_R), FILLET3_R, 90, 90)
            Line((0, -FILLET3_R), (0, 0))
            Line((0, 0), (FILLET3_R, 0))
        make_face()
    extrude(amount=2.1962459212727503)
    with BuildSketch(Plane(origin=(-4.144707864466866, 0.4160162451661125, -0.4056412762642723), x_dir=(-1, 0, 0), z_dir=(0, 0, 1))) as fillet3_piece_2:
        with BuildLine():
            CenterArc((FILLET3_R, -FILLET3_R), FILLET3_R, 90, 90)
            Line((0, -FILLET3_R), (0, 0))
            Line((0, 0), (FILLET3_R, 0))
        make_face()
    extrude(amount=2.1962459212727503)

    # Fillet4
    fillet4_edges = [part.edges().sort_by_distance(p)[0] for p in [
        (3.7999999999999994, 0.04999999999999982, 0.6924816843721027),
        (-3.7999999999999994, 0.04999999999999982, 0.6924816843721029),
    ]]
    fillet(fillet4_edges, radius=FILLET4_R)


solid = part.part
